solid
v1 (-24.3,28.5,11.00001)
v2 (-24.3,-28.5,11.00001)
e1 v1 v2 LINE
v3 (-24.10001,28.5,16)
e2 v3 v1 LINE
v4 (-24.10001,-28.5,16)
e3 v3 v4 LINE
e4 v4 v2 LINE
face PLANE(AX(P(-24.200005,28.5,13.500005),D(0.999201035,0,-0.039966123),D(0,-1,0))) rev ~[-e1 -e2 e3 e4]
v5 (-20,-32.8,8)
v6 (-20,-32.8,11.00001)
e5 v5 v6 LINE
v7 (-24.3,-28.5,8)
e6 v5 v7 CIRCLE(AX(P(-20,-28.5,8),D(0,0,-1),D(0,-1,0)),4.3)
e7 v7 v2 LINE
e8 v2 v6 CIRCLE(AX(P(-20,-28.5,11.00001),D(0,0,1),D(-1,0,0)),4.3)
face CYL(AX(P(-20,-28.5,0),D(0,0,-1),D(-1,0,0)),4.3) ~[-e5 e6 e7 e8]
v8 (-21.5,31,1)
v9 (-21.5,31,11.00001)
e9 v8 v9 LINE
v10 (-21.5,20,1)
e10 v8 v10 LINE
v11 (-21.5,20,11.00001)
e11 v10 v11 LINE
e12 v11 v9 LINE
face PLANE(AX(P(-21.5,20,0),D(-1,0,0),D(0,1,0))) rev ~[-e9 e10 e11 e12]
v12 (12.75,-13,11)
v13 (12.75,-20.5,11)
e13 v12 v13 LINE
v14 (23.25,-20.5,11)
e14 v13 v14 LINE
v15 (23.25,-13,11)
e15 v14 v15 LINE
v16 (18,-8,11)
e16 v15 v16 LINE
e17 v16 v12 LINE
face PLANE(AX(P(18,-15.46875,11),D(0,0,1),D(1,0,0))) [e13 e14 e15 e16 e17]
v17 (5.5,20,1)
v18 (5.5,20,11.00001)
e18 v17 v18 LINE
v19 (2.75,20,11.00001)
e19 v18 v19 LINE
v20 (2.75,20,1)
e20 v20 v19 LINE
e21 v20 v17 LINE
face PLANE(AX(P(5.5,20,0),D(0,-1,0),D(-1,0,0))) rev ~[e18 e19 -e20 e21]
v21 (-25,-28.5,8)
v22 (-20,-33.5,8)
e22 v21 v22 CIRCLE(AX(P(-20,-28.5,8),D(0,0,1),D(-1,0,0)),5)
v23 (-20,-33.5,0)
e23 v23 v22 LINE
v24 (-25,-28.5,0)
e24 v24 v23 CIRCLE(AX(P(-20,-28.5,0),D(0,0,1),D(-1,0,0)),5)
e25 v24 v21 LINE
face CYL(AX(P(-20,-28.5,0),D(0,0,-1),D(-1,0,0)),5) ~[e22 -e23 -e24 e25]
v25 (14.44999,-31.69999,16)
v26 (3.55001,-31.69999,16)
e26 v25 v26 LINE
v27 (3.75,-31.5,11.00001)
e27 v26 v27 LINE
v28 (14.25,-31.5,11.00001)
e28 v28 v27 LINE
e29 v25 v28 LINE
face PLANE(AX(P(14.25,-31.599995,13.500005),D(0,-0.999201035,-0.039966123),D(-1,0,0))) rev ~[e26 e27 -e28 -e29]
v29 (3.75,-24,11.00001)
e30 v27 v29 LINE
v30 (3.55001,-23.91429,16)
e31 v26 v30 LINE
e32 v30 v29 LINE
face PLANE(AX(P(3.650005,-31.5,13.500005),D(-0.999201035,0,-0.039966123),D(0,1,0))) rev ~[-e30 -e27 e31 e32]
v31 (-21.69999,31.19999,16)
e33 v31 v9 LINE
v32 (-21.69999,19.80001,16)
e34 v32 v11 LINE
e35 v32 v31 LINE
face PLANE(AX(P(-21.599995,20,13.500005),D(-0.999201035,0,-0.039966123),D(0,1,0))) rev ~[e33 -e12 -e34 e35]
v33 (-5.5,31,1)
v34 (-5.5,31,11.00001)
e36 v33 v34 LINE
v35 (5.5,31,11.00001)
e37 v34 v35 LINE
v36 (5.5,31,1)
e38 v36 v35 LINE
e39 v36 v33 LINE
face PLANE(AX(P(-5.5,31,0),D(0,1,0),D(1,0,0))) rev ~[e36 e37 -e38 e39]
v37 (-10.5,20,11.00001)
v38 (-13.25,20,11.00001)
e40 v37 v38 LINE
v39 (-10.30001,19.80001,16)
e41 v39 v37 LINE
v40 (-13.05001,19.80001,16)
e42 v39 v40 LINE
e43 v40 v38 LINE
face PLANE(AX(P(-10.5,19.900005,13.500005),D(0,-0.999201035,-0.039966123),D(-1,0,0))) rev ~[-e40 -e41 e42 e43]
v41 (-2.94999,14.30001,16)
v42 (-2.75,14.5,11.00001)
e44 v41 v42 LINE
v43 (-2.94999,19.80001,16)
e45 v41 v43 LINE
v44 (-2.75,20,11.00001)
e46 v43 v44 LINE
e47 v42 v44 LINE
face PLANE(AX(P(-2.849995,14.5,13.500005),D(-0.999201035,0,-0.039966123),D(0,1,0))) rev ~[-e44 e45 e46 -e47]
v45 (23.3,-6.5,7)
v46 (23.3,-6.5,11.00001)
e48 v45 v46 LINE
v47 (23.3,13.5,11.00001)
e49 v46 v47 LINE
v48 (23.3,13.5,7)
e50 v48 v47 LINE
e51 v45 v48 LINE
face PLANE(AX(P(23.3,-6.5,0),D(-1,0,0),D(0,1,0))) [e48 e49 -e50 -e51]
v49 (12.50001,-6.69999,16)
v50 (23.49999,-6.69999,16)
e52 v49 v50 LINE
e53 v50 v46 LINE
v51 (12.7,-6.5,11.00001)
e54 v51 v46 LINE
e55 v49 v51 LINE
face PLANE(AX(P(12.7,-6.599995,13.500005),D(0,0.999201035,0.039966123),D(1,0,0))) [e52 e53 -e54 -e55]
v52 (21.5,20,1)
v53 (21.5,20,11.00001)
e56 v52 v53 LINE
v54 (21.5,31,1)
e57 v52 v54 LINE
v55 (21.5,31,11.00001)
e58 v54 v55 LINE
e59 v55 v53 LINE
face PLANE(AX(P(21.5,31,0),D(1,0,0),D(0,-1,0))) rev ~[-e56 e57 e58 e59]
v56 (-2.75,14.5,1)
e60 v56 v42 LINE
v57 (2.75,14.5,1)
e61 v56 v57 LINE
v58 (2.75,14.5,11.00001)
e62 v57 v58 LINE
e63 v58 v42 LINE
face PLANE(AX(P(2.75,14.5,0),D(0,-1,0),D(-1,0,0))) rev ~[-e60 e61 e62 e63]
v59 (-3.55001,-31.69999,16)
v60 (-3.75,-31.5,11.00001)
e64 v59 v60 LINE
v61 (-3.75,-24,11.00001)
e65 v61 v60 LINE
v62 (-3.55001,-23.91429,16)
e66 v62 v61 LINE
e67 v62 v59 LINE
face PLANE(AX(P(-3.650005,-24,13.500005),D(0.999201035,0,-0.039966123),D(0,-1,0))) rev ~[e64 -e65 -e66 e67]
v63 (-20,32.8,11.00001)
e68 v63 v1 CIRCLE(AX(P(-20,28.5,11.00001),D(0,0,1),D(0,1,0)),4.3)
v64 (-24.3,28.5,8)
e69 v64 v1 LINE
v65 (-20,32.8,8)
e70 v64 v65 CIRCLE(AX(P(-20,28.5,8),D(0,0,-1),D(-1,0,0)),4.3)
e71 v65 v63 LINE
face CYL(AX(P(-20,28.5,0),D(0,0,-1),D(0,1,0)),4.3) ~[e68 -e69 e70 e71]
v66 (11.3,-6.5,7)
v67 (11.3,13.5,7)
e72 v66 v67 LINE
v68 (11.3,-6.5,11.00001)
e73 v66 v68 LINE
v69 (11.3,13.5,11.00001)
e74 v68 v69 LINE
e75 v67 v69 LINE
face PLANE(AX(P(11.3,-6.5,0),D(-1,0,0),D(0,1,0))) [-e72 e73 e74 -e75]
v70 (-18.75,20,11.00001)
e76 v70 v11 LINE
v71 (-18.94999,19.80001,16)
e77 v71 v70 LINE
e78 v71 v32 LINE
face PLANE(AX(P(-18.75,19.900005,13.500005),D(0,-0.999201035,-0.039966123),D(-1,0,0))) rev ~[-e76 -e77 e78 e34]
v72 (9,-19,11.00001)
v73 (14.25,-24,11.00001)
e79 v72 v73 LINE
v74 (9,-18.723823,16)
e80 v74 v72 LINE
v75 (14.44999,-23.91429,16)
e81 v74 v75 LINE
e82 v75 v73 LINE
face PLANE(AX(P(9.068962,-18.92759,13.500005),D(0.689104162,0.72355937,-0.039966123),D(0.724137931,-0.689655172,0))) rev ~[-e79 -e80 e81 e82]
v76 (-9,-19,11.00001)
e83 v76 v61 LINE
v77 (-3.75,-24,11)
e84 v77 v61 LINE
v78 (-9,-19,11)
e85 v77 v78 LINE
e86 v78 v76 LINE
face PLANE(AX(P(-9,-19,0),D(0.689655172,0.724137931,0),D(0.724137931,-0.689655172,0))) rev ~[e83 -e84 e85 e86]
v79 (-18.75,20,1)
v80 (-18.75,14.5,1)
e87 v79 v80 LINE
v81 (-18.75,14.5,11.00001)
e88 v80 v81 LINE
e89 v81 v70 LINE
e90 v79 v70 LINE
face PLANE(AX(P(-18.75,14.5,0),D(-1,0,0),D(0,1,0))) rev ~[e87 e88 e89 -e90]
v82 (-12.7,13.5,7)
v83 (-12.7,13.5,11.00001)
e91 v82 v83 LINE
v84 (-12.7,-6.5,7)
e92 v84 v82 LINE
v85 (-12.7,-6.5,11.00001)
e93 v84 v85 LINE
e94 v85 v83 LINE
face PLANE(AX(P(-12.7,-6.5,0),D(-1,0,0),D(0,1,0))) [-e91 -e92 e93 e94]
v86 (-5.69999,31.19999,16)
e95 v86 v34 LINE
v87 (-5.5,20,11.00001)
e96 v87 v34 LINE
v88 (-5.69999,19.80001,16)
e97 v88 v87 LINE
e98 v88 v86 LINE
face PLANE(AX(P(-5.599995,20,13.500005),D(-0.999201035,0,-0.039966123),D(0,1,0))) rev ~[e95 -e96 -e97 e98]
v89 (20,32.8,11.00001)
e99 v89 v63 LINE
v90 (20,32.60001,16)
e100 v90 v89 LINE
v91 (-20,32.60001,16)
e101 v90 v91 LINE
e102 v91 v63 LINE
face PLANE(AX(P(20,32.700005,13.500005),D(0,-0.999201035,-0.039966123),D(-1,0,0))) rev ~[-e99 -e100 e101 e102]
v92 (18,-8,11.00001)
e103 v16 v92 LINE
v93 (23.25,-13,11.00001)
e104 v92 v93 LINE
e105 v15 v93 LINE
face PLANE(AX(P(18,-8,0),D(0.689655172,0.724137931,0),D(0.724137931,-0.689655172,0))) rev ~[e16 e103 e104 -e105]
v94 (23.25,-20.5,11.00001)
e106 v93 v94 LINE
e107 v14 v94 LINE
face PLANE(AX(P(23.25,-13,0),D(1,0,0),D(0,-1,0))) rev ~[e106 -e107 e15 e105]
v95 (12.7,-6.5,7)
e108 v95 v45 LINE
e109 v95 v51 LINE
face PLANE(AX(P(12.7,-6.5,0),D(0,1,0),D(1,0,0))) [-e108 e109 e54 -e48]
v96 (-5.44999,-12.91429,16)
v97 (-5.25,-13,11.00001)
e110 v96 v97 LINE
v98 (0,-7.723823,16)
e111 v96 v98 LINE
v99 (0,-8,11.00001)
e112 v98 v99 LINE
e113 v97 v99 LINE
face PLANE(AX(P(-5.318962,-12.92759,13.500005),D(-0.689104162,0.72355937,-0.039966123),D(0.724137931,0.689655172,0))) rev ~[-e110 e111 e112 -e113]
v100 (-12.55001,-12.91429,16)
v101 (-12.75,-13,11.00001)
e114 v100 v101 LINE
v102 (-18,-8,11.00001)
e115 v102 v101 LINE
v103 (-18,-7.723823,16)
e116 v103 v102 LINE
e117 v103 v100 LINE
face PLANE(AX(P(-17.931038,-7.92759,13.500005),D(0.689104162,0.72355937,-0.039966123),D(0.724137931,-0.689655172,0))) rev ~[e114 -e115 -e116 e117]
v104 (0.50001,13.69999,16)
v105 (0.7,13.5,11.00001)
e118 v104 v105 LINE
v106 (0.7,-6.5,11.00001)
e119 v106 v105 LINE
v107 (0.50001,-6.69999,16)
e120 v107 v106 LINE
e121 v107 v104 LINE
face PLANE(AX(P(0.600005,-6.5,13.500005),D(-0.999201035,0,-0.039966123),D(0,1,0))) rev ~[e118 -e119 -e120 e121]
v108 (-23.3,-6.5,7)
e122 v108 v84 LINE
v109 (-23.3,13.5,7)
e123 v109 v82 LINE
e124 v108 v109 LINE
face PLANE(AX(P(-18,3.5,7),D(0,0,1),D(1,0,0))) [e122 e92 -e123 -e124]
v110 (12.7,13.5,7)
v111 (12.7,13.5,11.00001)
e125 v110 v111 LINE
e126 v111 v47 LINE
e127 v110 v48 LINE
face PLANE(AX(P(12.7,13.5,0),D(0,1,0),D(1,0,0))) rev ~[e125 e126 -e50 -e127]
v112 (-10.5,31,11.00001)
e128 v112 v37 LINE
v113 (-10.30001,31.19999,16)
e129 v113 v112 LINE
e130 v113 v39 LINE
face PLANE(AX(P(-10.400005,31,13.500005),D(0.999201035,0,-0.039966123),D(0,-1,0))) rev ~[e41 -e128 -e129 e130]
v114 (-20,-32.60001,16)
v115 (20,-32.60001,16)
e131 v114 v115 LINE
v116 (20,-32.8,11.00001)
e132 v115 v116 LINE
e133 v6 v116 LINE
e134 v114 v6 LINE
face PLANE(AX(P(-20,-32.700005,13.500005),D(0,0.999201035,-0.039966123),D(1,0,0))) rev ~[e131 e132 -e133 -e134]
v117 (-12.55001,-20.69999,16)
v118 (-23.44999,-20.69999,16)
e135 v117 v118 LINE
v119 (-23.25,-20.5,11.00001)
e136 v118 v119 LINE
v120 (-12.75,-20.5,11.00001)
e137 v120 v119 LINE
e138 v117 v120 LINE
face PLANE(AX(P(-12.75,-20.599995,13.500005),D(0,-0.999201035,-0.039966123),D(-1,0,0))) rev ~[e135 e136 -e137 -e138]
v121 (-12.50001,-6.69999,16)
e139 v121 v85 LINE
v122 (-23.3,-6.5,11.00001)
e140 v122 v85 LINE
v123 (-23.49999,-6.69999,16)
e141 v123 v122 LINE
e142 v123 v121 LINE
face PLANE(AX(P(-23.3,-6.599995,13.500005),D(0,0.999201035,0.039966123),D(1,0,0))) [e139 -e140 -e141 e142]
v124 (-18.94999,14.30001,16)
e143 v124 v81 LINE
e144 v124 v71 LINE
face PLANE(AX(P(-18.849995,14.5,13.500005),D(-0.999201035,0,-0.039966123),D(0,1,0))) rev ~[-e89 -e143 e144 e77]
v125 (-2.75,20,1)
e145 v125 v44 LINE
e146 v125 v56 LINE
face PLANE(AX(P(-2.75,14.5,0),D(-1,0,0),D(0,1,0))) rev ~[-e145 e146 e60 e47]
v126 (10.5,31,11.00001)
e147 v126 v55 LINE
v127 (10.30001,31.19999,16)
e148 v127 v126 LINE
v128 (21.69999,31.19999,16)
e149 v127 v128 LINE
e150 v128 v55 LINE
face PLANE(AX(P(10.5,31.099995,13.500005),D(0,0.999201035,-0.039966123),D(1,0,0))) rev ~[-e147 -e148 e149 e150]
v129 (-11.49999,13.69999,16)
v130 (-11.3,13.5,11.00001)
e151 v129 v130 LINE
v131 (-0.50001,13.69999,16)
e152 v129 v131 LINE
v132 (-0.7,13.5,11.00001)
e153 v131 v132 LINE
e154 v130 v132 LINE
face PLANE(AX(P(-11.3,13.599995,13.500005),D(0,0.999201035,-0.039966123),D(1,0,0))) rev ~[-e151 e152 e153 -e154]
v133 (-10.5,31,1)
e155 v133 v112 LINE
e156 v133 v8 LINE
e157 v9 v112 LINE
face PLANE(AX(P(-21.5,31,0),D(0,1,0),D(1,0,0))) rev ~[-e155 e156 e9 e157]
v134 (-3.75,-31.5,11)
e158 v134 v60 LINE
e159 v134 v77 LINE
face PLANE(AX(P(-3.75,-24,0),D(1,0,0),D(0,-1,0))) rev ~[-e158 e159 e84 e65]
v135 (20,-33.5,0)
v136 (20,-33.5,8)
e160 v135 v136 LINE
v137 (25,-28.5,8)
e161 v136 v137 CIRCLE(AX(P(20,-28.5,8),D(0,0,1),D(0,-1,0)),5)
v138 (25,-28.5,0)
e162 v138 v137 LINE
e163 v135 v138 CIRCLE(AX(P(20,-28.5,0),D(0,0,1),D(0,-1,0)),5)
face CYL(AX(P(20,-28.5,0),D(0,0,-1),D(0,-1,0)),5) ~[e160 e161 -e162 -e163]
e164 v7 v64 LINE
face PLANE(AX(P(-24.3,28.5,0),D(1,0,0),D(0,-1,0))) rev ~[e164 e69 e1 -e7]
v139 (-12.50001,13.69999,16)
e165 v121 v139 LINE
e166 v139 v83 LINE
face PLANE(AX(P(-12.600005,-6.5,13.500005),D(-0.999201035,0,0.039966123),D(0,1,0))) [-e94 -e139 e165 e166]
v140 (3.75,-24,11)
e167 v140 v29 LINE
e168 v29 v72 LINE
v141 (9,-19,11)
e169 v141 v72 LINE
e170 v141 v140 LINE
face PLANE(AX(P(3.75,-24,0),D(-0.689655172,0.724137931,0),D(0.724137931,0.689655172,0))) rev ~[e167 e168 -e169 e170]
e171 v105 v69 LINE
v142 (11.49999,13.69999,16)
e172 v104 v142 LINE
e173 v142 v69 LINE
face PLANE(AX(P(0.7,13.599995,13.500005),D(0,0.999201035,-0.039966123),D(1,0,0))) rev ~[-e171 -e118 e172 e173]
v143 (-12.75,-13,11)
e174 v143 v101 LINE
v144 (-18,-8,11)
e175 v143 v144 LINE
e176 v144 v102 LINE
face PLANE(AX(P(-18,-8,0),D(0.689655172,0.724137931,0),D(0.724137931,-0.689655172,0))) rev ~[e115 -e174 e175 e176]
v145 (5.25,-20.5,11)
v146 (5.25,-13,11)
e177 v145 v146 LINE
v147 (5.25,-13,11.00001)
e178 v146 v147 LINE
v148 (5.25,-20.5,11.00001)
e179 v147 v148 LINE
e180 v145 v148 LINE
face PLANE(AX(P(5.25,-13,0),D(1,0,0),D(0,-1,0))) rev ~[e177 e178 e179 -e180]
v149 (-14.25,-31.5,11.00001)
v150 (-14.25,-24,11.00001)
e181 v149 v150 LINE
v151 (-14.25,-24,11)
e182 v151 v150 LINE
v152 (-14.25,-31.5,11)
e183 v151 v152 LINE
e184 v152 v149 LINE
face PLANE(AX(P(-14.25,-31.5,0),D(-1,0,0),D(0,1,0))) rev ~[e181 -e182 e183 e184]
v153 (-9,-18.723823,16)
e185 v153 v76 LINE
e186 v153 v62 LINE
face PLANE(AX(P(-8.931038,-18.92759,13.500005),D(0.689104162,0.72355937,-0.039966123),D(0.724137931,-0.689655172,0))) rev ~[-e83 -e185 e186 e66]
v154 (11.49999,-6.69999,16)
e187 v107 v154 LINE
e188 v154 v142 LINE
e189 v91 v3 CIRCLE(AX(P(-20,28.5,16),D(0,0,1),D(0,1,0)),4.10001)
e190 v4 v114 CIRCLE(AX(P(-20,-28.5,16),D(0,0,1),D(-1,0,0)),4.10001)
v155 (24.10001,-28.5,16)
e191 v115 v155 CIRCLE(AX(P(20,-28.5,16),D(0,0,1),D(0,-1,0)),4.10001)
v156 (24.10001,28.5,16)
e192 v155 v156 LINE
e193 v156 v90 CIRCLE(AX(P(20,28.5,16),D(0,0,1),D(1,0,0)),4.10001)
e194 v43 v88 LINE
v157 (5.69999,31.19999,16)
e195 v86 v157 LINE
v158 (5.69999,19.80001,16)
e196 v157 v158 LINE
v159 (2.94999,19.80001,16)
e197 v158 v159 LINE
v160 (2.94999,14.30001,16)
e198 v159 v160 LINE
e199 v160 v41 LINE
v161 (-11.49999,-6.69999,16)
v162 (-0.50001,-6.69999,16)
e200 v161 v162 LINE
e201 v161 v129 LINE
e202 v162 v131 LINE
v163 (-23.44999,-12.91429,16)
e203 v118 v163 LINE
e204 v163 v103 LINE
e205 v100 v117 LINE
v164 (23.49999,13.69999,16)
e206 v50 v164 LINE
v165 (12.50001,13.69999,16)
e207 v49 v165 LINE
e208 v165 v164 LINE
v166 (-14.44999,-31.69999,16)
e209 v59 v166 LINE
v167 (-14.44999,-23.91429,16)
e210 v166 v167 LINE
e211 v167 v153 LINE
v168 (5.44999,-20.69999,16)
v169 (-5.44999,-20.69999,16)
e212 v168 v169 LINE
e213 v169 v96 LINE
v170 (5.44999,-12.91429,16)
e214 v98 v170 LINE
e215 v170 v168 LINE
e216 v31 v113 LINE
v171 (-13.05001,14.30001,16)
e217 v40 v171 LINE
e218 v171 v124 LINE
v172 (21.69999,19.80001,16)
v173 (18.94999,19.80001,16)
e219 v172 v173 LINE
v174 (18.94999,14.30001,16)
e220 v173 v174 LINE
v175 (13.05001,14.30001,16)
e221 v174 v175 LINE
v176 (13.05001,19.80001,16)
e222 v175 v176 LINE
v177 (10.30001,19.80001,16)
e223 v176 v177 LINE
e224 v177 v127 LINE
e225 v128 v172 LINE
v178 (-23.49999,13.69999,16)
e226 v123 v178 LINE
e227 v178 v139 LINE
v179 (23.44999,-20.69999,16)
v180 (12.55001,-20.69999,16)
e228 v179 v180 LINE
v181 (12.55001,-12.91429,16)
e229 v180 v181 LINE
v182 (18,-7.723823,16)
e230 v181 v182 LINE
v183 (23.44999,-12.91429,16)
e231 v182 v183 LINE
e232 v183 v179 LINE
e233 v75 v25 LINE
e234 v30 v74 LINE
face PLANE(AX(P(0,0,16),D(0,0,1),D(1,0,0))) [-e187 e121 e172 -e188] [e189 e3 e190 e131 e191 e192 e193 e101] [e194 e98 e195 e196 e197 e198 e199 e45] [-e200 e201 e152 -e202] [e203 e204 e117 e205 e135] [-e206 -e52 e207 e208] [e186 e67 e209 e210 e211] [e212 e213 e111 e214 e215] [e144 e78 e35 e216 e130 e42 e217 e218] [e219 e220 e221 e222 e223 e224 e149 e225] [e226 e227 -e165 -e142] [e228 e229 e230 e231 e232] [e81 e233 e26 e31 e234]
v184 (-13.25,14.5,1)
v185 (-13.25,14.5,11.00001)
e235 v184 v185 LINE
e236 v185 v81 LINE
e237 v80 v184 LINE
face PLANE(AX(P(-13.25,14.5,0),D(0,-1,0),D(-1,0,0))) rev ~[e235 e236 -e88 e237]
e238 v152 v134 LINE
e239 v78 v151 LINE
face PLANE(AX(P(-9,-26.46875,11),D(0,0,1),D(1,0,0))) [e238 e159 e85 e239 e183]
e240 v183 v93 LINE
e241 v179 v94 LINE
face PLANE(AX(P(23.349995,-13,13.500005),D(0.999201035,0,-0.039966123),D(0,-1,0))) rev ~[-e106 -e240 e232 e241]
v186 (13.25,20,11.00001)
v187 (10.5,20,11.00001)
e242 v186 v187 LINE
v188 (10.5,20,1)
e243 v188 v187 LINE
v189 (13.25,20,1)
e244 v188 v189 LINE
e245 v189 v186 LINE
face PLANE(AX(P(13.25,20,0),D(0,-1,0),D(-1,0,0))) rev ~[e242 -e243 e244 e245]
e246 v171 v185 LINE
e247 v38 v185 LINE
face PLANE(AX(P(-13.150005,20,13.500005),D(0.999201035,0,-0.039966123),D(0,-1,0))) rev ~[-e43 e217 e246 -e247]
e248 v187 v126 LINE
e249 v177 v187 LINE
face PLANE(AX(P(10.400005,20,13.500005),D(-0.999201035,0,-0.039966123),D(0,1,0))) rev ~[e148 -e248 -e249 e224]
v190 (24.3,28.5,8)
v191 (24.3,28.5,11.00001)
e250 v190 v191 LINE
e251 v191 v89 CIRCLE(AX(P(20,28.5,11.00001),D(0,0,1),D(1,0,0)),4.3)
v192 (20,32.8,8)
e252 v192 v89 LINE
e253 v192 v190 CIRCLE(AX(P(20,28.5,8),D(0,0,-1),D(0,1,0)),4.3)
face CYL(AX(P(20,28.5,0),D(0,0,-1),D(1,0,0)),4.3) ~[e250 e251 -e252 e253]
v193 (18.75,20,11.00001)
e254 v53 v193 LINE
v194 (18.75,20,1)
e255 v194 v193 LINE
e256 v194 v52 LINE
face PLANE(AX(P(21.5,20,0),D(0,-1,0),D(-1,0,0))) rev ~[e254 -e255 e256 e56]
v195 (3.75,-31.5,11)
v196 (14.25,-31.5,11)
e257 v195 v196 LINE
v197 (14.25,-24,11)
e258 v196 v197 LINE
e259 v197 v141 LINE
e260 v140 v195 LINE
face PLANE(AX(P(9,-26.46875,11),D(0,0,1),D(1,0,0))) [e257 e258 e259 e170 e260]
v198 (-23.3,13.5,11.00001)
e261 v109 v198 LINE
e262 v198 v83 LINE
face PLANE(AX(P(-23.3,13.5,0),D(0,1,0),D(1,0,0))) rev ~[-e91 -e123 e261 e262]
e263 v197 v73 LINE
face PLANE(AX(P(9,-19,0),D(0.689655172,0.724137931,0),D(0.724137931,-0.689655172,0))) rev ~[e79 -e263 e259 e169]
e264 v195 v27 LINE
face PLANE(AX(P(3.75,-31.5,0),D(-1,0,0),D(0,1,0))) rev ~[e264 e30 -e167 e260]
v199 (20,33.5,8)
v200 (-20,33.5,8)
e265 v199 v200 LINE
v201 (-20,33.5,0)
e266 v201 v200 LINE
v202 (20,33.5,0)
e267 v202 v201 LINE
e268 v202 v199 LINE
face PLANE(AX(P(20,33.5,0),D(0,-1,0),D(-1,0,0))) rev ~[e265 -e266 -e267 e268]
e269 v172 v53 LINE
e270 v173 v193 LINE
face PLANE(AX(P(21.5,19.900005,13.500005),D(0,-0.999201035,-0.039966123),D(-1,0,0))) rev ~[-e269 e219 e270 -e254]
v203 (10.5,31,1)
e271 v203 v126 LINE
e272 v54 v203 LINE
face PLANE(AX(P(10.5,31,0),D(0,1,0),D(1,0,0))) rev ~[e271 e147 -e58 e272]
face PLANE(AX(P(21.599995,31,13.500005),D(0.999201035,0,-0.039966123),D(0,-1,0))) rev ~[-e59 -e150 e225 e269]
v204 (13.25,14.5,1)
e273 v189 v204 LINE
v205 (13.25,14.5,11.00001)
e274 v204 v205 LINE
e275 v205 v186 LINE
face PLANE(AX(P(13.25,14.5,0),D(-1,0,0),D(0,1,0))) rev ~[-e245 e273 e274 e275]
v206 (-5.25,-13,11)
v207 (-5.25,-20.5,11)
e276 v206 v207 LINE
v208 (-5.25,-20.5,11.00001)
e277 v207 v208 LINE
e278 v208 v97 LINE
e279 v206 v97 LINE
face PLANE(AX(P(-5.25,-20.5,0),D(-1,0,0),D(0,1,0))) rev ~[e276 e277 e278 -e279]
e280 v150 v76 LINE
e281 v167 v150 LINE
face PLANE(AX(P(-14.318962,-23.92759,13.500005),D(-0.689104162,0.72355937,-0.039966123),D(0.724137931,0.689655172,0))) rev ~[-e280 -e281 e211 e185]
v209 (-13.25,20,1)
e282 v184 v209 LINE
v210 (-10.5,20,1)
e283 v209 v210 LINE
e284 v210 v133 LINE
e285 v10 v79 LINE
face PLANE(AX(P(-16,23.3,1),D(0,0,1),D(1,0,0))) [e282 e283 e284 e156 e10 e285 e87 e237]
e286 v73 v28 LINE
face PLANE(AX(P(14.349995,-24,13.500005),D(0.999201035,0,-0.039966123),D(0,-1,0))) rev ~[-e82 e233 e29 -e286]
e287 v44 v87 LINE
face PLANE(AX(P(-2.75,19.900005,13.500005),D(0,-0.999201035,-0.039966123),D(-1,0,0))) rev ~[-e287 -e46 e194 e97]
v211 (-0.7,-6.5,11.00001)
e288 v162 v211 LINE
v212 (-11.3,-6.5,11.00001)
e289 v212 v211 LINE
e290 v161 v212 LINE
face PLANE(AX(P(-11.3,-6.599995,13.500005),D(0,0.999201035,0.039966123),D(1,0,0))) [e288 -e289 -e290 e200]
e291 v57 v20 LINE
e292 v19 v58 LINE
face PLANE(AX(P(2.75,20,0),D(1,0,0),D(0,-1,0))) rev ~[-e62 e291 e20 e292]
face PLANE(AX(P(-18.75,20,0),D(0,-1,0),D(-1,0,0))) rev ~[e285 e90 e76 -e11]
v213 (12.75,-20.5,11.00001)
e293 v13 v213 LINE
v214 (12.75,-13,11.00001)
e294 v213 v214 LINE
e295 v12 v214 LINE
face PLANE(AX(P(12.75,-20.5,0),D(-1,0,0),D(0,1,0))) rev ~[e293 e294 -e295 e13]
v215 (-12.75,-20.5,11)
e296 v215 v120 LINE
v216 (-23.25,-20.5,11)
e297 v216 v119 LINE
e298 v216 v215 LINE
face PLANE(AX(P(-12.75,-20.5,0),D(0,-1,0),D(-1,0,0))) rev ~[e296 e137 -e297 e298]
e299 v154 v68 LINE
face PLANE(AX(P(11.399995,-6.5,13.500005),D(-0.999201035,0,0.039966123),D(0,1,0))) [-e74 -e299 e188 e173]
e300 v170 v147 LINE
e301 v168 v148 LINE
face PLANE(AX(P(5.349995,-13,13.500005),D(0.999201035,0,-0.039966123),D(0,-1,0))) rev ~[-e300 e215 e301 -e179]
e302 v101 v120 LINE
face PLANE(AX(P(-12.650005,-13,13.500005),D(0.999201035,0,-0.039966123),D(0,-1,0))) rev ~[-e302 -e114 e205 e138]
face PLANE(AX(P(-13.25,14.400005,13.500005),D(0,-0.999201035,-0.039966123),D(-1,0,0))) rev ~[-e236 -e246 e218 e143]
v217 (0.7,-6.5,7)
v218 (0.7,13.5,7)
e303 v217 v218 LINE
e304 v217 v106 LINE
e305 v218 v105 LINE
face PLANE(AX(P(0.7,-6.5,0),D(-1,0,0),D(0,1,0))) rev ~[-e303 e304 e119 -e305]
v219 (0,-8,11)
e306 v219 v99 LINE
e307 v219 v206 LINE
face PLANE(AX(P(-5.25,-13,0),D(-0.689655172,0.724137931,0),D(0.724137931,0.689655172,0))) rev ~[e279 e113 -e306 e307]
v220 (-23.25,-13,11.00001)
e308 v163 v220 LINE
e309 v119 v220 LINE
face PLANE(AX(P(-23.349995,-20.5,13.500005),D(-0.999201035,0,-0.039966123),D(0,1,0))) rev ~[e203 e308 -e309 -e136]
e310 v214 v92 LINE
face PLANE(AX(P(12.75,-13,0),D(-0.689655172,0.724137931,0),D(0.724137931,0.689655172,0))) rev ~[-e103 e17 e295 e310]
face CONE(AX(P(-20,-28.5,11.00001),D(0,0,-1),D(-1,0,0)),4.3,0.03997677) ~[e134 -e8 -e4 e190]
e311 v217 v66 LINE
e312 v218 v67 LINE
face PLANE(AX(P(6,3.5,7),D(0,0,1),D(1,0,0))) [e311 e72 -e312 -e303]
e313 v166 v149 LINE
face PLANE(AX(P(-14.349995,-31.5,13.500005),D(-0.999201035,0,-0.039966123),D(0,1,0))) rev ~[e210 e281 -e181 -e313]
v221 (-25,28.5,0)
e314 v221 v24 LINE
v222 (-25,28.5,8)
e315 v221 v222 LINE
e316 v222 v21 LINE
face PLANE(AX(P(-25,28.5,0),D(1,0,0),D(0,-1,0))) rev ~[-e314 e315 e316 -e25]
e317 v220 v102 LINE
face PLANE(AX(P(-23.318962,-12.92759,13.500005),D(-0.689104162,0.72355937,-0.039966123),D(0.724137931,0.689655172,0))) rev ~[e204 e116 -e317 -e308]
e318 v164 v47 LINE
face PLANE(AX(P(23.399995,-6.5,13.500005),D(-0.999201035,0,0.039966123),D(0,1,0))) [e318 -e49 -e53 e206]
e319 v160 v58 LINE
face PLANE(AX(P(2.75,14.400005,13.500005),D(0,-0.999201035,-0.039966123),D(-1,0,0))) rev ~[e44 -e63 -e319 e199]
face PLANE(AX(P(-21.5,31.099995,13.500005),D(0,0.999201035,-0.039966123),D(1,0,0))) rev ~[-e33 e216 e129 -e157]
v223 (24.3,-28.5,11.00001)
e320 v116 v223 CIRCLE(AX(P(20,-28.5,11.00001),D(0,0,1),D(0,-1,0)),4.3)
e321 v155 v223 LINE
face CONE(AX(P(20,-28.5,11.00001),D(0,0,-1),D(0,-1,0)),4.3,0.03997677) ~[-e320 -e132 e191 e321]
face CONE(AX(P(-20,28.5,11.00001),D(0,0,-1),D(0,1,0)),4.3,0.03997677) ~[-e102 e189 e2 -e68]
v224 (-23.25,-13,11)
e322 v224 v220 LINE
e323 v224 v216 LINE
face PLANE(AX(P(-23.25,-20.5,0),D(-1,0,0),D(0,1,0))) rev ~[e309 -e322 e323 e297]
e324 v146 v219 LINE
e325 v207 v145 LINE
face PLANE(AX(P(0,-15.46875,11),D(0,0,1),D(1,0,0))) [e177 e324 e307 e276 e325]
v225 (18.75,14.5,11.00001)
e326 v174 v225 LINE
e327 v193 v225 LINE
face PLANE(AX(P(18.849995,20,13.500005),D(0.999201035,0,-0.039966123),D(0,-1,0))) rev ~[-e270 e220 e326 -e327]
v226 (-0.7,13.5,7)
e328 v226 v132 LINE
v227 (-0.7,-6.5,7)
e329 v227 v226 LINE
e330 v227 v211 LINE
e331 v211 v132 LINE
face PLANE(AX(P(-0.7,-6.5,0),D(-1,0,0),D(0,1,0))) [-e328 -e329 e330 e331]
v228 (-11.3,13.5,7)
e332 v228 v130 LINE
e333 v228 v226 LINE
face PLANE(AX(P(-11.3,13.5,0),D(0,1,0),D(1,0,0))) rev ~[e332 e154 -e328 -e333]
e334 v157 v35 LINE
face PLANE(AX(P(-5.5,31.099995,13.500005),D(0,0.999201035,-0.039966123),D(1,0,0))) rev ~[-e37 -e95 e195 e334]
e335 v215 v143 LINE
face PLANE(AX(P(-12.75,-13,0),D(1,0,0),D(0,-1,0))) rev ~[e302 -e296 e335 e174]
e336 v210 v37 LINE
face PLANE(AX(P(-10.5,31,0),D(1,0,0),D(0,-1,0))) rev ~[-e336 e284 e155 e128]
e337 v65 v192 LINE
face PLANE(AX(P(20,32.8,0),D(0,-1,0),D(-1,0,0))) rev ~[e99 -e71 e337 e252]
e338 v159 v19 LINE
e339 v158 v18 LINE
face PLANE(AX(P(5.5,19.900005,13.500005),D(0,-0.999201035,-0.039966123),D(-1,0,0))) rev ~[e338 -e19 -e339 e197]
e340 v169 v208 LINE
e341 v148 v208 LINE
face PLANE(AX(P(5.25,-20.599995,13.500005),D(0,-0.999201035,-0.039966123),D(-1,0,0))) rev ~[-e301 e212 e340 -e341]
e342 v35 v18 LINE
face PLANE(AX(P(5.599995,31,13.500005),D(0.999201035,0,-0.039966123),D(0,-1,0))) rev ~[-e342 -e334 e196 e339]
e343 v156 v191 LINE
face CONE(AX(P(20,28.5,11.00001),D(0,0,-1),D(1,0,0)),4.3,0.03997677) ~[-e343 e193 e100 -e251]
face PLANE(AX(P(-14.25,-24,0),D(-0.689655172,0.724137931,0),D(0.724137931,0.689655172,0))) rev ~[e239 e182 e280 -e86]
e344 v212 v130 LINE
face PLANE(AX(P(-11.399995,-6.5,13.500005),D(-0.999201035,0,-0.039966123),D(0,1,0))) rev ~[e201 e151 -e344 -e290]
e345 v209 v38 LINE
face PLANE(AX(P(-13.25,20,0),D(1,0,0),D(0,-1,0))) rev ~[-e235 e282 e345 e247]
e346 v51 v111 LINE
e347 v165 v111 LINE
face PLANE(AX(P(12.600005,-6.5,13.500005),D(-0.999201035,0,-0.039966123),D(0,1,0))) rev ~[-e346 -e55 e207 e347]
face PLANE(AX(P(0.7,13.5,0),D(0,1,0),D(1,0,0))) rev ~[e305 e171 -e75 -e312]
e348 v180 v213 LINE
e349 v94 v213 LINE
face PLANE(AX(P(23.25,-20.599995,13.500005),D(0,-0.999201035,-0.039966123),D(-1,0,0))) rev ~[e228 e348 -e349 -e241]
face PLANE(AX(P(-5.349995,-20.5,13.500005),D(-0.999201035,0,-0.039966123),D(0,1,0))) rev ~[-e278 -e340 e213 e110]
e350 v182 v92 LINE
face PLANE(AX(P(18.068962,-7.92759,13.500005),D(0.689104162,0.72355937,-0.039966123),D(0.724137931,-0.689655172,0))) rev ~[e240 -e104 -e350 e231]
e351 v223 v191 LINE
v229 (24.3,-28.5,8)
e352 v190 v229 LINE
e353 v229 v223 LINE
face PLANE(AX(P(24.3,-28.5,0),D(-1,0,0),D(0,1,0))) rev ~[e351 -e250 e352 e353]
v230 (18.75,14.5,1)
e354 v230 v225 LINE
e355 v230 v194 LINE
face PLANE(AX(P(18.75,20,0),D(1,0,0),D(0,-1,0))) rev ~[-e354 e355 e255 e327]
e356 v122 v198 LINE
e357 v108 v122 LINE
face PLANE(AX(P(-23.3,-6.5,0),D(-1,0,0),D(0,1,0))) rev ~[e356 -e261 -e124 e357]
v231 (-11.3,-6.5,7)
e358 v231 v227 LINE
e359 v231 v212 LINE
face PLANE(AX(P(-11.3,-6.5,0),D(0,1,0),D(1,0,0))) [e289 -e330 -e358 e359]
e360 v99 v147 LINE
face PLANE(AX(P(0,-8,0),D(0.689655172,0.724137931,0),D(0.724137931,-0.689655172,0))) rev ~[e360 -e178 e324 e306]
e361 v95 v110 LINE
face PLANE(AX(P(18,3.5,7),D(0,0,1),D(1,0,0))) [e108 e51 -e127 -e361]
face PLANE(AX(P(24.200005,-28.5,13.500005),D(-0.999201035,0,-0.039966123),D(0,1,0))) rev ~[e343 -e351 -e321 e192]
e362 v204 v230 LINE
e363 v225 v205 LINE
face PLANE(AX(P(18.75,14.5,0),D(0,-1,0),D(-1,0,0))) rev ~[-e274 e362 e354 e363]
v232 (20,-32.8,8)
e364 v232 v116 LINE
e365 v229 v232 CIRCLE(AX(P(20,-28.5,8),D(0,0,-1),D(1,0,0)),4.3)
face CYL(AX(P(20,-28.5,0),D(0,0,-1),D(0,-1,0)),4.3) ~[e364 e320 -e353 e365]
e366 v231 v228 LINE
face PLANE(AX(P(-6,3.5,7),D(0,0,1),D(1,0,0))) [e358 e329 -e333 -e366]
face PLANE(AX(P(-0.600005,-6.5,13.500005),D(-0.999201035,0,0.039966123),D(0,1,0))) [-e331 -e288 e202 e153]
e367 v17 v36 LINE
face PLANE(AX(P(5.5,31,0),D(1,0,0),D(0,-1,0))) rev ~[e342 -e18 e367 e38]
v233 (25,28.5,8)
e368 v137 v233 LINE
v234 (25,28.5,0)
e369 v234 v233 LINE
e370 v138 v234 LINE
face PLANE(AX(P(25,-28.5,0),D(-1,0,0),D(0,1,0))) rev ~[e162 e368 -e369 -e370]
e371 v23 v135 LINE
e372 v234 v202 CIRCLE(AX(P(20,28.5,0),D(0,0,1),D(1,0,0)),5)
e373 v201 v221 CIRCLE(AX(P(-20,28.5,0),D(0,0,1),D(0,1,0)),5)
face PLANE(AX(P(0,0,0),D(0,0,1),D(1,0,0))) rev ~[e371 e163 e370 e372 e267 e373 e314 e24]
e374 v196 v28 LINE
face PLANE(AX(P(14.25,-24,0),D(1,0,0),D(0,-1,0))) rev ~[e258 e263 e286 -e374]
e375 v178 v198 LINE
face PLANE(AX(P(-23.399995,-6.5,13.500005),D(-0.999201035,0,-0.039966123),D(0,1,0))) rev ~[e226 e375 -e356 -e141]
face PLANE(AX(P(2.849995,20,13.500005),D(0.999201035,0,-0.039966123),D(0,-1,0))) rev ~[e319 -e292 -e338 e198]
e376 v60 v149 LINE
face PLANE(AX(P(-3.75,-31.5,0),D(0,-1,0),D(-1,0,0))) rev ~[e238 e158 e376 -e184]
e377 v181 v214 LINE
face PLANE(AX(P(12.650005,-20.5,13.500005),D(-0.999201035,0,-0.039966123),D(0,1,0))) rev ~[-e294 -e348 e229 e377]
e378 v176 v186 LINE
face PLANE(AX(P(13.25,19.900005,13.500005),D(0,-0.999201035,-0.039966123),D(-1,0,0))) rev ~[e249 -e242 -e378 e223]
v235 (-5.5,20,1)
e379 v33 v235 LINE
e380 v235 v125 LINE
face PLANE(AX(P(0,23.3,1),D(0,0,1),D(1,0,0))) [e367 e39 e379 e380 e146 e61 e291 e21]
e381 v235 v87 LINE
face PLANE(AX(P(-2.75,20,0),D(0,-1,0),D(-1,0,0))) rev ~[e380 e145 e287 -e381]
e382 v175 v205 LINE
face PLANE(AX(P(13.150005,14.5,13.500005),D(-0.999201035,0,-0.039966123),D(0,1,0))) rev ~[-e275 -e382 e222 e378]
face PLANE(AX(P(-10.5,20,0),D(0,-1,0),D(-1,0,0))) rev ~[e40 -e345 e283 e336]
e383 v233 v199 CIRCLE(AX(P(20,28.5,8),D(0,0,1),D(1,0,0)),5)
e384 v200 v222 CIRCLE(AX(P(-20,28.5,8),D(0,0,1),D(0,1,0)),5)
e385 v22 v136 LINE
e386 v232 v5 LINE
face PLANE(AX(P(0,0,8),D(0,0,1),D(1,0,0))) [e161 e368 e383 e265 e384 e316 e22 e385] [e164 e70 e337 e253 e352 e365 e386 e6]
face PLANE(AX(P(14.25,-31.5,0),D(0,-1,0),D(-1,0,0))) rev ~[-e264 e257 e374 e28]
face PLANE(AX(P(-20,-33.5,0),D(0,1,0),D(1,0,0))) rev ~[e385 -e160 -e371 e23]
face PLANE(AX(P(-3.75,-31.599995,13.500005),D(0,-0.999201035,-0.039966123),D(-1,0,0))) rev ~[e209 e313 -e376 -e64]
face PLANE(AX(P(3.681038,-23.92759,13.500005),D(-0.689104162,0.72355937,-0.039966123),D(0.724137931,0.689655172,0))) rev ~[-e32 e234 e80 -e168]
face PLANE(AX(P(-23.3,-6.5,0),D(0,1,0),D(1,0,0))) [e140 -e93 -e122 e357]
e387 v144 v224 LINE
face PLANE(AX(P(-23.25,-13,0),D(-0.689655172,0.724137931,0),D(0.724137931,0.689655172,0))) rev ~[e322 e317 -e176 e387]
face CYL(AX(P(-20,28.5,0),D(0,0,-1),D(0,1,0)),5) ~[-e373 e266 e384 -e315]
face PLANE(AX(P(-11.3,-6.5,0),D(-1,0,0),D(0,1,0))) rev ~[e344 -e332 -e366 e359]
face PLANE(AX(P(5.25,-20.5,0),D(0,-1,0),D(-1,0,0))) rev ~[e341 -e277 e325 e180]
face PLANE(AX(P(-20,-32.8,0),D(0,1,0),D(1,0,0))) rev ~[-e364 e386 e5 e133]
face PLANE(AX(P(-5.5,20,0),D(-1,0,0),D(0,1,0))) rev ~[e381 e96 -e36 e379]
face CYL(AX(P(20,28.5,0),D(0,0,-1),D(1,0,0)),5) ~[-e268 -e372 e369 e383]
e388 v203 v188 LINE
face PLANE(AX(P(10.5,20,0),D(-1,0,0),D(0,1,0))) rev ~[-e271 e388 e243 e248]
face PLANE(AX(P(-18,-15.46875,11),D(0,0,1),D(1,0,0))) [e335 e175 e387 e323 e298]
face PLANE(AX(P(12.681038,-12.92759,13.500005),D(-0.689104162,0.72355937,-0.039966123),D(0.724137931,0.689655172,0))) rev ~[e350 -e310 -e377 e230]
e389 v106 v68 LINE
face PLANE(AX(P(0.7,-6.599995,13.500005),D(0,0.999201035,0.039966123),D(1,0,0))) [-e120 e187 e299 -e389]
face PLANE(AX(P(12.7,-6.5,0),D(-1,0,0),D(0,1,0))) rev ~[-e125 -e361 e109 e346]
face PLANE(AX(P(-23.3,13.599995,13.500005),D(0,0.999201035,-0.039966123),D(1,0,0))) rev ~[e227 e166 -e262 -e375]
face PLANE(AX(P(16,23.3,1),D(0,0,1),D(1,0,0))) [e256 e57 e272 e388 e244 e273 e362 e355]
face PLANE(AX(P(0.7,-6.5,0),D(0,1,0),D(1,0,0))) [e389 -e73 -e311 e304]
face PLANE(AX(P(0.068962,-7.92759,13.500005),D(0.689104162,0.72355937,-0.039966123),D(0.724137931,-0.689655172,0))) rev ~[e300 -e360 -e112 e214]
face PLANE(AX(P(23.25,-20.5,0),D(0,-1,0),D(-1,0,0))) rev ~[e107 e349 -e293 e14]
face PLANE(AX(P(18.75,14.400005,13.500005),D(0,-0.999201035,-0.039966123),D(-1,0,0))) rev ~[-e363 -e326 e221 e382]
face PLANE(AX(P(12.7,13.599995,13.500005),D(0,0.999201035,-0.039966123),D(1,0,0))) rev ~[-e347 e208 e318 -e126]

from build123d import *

# Parameters (mm, degrees)
F1_DEPTH = 1
F0_W     = 10.6
F0_H     = 20
F2_DEPTH = 7
F3_DEPTH = 11
F4_DEPTH = 16
F5_DEPTH = 8
F6_SIZE2 = 4.99999
F6_SIZE  = 0.19999


# Not quite as in the source:
# - a fillet or chamfer is up to 0.001 mm smaller than in the source, because OpenCascade refuses the exact size


with BuildPart() as f1:
    # F0 (on Top) → F1 (new body)
    with BuildSketch(Plane.XY):
        Polygon((-18.75, 14.5), (-13.25, 14.5), (-13.25, 20), (-10.5, 20), (-10.5, 31), (-21.5, 31), (-21.5, 20), (-18.75, 20), align=None)
    extrude(amount=F1_DEPTH)



with BuildPart() as f1b:
    # F0 (on Top) → F1, piece 2 (new body)
    with BuildSketch(Plane.XY):
        Polygon((5.5, 31), (-5.5, 31), (-5.5, 20), (-2.75, 20), (-2.75, 14.5), (2.75, 14.5), (2.75, 20), (5.5, 20), align=None)
    extrude(amount=F1_DEPTH)


with BuildPart() as f1c:
    # F0 (on Top) → F1, piece 3 (new body)
    with BuildSketch(Plane.XY):
        Polygon((21.5, 31), (10.5, 31), (10.5, 20), (13.25, 20), (13.25, 14.5), (18.75, 14.5), (18.75, 20), (21.5, 20), align=None)
    extrude(amount=F1_DEPTH)


with BuildPart() as f2:
    # F0 (on Top) → F2 (new body)
    with BuildSketch(Plane.XY):
        with Locations((-18, 3.5)):
            Rectangle(F0_W, F0_H)
    extrude(amount=F2_DEPTH)


with BuildPart() as f2b:
    # F0 (on Top) → F2, piece 2 (new body)
    with BuildSketch(Plane.XY):
        with Locations((-6, 3.5)):
            Rectangle(F0_W, F0_H)
    extrude(amount=F2_DEPTH)


with BuildPart() as f2c:
    # F0 (on Top) → F2, piece 3 (new body)
    with BuildSketch(Plane.XY):
        with Locations((6, 3.5)):
            Rectangle(F0_W, F0_H)
    extrude(amount=F2_DEPTH)


with BuildPart() as f2d:
    # F0 (on Top) → F2, piece 4 (new body)
    with BuildSketch(Plane.XY):
        with Locations((18, 3.5)):
            Rectangle(F0_W, F0_H)
    extrude(amount=F2_DEPTH)


with BuildPart() as f3:
    # F0 (on Top) → F3 (new body)
    with BuildSketch(Plane.XY):
        Polygon((-18, -8), (-23.25, -13), (-23.25, -20.5), (-12.75, -20.5), (-12.75, -13), align=None)
    extrude(amount=F3_DEPTH)


with BuildPart() as f3b:
    # F0 (on Top) → F3, piece 2 (new body)
    with BuildSketch(Plane.XY):
        Polygon((-5.25, -13), (-5.25, -20.5), (5.25, -20.5), (5.25, -13), (0, -8), align=None)
    extrude(amount=F3_DEPTH)


with BuildPart() as f3c:
    # F0 (on Top) → F3, piece 3 (new body)
    with BuildSketch(Plane.XY):
        Polygon((12.75, -13), (12.75, -20.5), (23.25, -20.5), (23.25, -13), (18, -8), align=None)
    extrude(amount=F3_DEPTH)


with BuildPart() as f3d:
    # F0 (on Top) → F3, piece 4 (new body)
    with BuildSketch(Plane.XY):
        Polygon((14.25, -31.5), (14.25, -24), (9, -19), (3.75, -24), (3.75, -31.5), align=None)
    extrude(amount=F3_DEPTH)


with BuildPart() as f3e:
    # F0 (on Top) → F3, piece 5 (new body)
    with BuildSketch(Plane.XY):
        Polygon((-3.75, -31.5), (-3.75, -24), (-9, -19), (-14.25, -24), (-14.25, -31.5), align=None)
    extrude(amount=F3_DEPTH)


with BuildPart() as f1_1:
    add(f1.part)

    add(f1b.part)  # F4 merges F1b

    add(f1c.part)  # F4 merges F1c

    add(f2.part)  # F4 merges F2

    add(f2b.part)  # F4 merges F2b

    add(f2c.part)  # F4 merges F2c

    add(f2d.part)  # F4 merges F2d

    add(f3.part)  # F4 merges F3

    add(f3b.part)  # F4 merges F3b

    add(f3c.part)  # F4 merges F3c

    add(f3d.part)  # F4 merges F3d

    add(f3e.part)  # F4 merges F3e
    # F0 (on Top) → F4 (join)
    with BuildSketch(Plane.XY):
        with BuildLine():
            ThreePointArc((24.3, 28.5), (23.0405591591, 31.5405591591), (20, 32.8))
            Line((20, 32.8), (-20, 32.8))
            ThreePointArc((-20, 32.8), (-23.0405591591, 31.5405591591), (-24.3, 28.5))
            Line((-24.3, 28.5), (-24.3, -28.5))
            ThreePointArc((-24.3, -28.5), (-23.0405591591, -31.5405591591), (-20, -32.8))
            Line((-20, -32.8), (20, -32.8))
            ThreePointArc((20, -32.8), (23.0405591591, -31.5405591591), (24.3, -28.5))
            Line((24.3, -28.5), (24.3, 28.5))
        make_face()
        Polygon((-9, -19), (-3.75, -24), (-3.75, -31.5), (-14.25, -31.5), (-14.25, -24), align=None, mode=Mode.SUBTRACT)
        Polygon((-23.25, -20.5), (-23.25, -13), (-18, -8), (-12.75, -13), (-12.75, -20.5), align=None, mode=Mode.SUBTRACT)
        Polygon((9, -19), (14.25, -24), (14.25, -31.5), (3.75, -31.5), (3.75, -24), align=None, mode=Mode.SUBTRACT)
        Polygon((5.25, -20.5), (-5.25, -20.5), (-5.25, -13), (0, -8), (5.25, -13), align=None, mode=Mode.SUBTRACT)
        Polygon((23.25, -20.5), (12.75, -20.5), (12.75, -13), (18, -8), (23.25, -13), align=None, mode=Mode.SUBTRACT)
        with Locations((-18, 3.5)):
            Rectangle(F0_W, F0_H, mode=Mode.SUBTRACT)
        with Locations((-6, 3.5)):
            Rectangle(F0_W, F0_H, mode=Mode.SUBTRACT)
        Polygon((-13.25, 20), (-13.25, 14.5), (-18.75, 14.5), (-18.75, 20), (-21.5, 20), (-21.5, 31), (-10.5, 31), (-10.5, 20), align=None, mode=Mode.SUBTRACT)
        with Locations((6, 3.5)):
            Rectangle(F0_W, F0_H, mode=Mode.SUBTRACT)
        with Locations((18, 3.5)):
            Rectangle(F0_W, F0_H, mode=Mode.SUBTRACT)
        Polygon((-5.5, 20), (-5.5, 31), (5.5, 31), (5.5, 20), (2.75, 20), (2.75, 14.5), (-2.75, 14.5), (-2.75, 20), align=None, mode=Mode.SUBTRACT)
        Polygon((10.5, 20), (10.5, 31), (21.5, 31), (21.5, 20), (18.75, 20), (18.75, 14.5), (13.25, 14.5), (13.25, 20), align=None, mode=Mode.SUBTRACT)
    extrude(amount=F4_DEPTH)

    # F0 (on Top) → F5 (join)
    with BuildSketch(Plane.XY):
        with BuildLine():
            ThreePointArc((25, 28.5), (23.5355339059, 32.0355339059), (20, 33.5))
            Line((20, 33.5), (-20, 33.5))
            ThreePointArc((-20, 33.5), (-23.5355339059, 32.0355339059), (-25, 28.5))
            Line((-25, 28.5), (-25, -28.5))
            ThreePointArc((-25, -28.5), (-23.5355339059, -32.0355339059), (-20, -33.5))
            Line((-20, -33.5), (20, -33.5))
            ThreePointArc((20, -33.5), (23.5355339059, -32.0355339059), (25, -28.5))
            Line((25, -28.5), (25, 28.5))
        make_face()
        with BuildLine():
            Line((-20, 32.8), (20, 32.8))
            ThreePointArc((20, 32.8), (23.0405591591, 31.5405591591), (24.3, 28.5))
            Line((24.3, 28.5), (24.3, -28.5))
            ThreePointArc((24.3, -28.5), (23.0405591591, -31.5405591591), (20, -32.8))
            Line((20, -32.8), (-20, -32.8))
            ThreePointArc((-20, -32.8), (-23.0405591591, -31.5405591591), (-24.3, -28.5))
            Line((-24.3, -28.5), (-24.3, 28.5))
            ThreePointArc((-24.3, 28.5), (-23.0405591591, 31.5405591591), (-20, 32.8))
        make_face(mode=Mode.SUBTRACT)
    extrude(amount=F5_DEPTH)

    # F6 (size 0.2 and 5 in the source; OpenCascade refuses exactly that, so slightly less here)
    f6_edges = [f1_1.edges().sort_by_distance(p)[0] for p in [
        (23.040559, 31.540559, 16),
        (0, 32.8, 16),
        (-23.040559, 31.540559, 16),
        (-24.3, 0, 16),
        (-23.040559, -31.540559, 16),
        (0, -32.8, 16),
        (23.040559, -31.540559, 16),
        (24.3, 0, 16),
        (-6.375, -21.5, 16),
        (-3.75, -27.75, 16),
        (-9, -31.5, 16),
        (-14.25, -27.75, 16),
        (-11.625, -21.5, 16),
        (-23.25, -16.75, 16),
        (-20.625, -10.5, 16),
        (-15.375, -10.5, 16),
        (-12.75, -16.75, 16),
        (-18, -20.5, 16),
        (11.625, -21.5, 16),
        (14.25, -27.75, 16),
        (9, -31.5, 16),
        (3.75, -27.75, 16),
        (6.375, -21.5, 16),
        (0, -20.5, 16),
        (-5.25, -16.75, 16),
        (-2.625, -10.5, 16),
        (2.625, -10.5, 16),
        (5.25, -16.75, 16),
        (18, -20.5, 16),
        (12.75, -16.75, 16),
        (15.375, -10.5, 16),
        (20.625, -10.5, 16),
        (23.25, -16.75, 16),
        (-23.3, 3.5, 16),
        (-18, 13.5, 16),
        (-12.7, 3.5, 16),
        (-18, -6.5, 16),
        (-6, -6.5, 16),
        (-11.3, 3.5, 16),
        (-6, 13.5, 16),
        (-0.7, 3.5, 16),
        (-13.25, 17.25, 16),
        (-16, 14.5, 16),
        (-18.75, 17.25, 16),
        (-20.125, 20, 16),
        (-21.5, 25.5, 16),
        (-16, 31, 16),
        (-10.5, 25.5, 16),
        (-11.875, 20, 16),
        (6, -6.5, 16),
        (0.7, 3.5, 16),
        (6, 13.5, 16),
        (11.3, 3.5, 16),
        (18, -6.5, 16),
        (12.7, 3.5, 16),
        (18, 13.5, 16),
        (23.3, 3.5, 16),
        (-5.5, 25.5, 16),
        (0, 31, 16),
        (5.5, 25.5, 16),
        (4.125, 20, 16),
        (2.75, 17.25, 16),
        (0, 14.5, 16),
        (-2.75, 17.25, 16),
        (-4.125, 20, 16),
        (10.5, 25.5, 16),
        (16, 31, 16),
        (21.5, 25.5, 16),
        (20.125, 20, 16),
        (18.75, 17.25, 16),
        (16, 14.5, 16),
        (13.25, 17.25, 16),
        (11.875, 20, 16),
    ]]
    f6_side = f1_1.faces().sort_by_distance((0, -2.524734, 16))[0]
    chamfer(f6_edges, length=F6_SIZE, length2=F6_SIZE2, reference=f6_side)


solid = f1_1.part
